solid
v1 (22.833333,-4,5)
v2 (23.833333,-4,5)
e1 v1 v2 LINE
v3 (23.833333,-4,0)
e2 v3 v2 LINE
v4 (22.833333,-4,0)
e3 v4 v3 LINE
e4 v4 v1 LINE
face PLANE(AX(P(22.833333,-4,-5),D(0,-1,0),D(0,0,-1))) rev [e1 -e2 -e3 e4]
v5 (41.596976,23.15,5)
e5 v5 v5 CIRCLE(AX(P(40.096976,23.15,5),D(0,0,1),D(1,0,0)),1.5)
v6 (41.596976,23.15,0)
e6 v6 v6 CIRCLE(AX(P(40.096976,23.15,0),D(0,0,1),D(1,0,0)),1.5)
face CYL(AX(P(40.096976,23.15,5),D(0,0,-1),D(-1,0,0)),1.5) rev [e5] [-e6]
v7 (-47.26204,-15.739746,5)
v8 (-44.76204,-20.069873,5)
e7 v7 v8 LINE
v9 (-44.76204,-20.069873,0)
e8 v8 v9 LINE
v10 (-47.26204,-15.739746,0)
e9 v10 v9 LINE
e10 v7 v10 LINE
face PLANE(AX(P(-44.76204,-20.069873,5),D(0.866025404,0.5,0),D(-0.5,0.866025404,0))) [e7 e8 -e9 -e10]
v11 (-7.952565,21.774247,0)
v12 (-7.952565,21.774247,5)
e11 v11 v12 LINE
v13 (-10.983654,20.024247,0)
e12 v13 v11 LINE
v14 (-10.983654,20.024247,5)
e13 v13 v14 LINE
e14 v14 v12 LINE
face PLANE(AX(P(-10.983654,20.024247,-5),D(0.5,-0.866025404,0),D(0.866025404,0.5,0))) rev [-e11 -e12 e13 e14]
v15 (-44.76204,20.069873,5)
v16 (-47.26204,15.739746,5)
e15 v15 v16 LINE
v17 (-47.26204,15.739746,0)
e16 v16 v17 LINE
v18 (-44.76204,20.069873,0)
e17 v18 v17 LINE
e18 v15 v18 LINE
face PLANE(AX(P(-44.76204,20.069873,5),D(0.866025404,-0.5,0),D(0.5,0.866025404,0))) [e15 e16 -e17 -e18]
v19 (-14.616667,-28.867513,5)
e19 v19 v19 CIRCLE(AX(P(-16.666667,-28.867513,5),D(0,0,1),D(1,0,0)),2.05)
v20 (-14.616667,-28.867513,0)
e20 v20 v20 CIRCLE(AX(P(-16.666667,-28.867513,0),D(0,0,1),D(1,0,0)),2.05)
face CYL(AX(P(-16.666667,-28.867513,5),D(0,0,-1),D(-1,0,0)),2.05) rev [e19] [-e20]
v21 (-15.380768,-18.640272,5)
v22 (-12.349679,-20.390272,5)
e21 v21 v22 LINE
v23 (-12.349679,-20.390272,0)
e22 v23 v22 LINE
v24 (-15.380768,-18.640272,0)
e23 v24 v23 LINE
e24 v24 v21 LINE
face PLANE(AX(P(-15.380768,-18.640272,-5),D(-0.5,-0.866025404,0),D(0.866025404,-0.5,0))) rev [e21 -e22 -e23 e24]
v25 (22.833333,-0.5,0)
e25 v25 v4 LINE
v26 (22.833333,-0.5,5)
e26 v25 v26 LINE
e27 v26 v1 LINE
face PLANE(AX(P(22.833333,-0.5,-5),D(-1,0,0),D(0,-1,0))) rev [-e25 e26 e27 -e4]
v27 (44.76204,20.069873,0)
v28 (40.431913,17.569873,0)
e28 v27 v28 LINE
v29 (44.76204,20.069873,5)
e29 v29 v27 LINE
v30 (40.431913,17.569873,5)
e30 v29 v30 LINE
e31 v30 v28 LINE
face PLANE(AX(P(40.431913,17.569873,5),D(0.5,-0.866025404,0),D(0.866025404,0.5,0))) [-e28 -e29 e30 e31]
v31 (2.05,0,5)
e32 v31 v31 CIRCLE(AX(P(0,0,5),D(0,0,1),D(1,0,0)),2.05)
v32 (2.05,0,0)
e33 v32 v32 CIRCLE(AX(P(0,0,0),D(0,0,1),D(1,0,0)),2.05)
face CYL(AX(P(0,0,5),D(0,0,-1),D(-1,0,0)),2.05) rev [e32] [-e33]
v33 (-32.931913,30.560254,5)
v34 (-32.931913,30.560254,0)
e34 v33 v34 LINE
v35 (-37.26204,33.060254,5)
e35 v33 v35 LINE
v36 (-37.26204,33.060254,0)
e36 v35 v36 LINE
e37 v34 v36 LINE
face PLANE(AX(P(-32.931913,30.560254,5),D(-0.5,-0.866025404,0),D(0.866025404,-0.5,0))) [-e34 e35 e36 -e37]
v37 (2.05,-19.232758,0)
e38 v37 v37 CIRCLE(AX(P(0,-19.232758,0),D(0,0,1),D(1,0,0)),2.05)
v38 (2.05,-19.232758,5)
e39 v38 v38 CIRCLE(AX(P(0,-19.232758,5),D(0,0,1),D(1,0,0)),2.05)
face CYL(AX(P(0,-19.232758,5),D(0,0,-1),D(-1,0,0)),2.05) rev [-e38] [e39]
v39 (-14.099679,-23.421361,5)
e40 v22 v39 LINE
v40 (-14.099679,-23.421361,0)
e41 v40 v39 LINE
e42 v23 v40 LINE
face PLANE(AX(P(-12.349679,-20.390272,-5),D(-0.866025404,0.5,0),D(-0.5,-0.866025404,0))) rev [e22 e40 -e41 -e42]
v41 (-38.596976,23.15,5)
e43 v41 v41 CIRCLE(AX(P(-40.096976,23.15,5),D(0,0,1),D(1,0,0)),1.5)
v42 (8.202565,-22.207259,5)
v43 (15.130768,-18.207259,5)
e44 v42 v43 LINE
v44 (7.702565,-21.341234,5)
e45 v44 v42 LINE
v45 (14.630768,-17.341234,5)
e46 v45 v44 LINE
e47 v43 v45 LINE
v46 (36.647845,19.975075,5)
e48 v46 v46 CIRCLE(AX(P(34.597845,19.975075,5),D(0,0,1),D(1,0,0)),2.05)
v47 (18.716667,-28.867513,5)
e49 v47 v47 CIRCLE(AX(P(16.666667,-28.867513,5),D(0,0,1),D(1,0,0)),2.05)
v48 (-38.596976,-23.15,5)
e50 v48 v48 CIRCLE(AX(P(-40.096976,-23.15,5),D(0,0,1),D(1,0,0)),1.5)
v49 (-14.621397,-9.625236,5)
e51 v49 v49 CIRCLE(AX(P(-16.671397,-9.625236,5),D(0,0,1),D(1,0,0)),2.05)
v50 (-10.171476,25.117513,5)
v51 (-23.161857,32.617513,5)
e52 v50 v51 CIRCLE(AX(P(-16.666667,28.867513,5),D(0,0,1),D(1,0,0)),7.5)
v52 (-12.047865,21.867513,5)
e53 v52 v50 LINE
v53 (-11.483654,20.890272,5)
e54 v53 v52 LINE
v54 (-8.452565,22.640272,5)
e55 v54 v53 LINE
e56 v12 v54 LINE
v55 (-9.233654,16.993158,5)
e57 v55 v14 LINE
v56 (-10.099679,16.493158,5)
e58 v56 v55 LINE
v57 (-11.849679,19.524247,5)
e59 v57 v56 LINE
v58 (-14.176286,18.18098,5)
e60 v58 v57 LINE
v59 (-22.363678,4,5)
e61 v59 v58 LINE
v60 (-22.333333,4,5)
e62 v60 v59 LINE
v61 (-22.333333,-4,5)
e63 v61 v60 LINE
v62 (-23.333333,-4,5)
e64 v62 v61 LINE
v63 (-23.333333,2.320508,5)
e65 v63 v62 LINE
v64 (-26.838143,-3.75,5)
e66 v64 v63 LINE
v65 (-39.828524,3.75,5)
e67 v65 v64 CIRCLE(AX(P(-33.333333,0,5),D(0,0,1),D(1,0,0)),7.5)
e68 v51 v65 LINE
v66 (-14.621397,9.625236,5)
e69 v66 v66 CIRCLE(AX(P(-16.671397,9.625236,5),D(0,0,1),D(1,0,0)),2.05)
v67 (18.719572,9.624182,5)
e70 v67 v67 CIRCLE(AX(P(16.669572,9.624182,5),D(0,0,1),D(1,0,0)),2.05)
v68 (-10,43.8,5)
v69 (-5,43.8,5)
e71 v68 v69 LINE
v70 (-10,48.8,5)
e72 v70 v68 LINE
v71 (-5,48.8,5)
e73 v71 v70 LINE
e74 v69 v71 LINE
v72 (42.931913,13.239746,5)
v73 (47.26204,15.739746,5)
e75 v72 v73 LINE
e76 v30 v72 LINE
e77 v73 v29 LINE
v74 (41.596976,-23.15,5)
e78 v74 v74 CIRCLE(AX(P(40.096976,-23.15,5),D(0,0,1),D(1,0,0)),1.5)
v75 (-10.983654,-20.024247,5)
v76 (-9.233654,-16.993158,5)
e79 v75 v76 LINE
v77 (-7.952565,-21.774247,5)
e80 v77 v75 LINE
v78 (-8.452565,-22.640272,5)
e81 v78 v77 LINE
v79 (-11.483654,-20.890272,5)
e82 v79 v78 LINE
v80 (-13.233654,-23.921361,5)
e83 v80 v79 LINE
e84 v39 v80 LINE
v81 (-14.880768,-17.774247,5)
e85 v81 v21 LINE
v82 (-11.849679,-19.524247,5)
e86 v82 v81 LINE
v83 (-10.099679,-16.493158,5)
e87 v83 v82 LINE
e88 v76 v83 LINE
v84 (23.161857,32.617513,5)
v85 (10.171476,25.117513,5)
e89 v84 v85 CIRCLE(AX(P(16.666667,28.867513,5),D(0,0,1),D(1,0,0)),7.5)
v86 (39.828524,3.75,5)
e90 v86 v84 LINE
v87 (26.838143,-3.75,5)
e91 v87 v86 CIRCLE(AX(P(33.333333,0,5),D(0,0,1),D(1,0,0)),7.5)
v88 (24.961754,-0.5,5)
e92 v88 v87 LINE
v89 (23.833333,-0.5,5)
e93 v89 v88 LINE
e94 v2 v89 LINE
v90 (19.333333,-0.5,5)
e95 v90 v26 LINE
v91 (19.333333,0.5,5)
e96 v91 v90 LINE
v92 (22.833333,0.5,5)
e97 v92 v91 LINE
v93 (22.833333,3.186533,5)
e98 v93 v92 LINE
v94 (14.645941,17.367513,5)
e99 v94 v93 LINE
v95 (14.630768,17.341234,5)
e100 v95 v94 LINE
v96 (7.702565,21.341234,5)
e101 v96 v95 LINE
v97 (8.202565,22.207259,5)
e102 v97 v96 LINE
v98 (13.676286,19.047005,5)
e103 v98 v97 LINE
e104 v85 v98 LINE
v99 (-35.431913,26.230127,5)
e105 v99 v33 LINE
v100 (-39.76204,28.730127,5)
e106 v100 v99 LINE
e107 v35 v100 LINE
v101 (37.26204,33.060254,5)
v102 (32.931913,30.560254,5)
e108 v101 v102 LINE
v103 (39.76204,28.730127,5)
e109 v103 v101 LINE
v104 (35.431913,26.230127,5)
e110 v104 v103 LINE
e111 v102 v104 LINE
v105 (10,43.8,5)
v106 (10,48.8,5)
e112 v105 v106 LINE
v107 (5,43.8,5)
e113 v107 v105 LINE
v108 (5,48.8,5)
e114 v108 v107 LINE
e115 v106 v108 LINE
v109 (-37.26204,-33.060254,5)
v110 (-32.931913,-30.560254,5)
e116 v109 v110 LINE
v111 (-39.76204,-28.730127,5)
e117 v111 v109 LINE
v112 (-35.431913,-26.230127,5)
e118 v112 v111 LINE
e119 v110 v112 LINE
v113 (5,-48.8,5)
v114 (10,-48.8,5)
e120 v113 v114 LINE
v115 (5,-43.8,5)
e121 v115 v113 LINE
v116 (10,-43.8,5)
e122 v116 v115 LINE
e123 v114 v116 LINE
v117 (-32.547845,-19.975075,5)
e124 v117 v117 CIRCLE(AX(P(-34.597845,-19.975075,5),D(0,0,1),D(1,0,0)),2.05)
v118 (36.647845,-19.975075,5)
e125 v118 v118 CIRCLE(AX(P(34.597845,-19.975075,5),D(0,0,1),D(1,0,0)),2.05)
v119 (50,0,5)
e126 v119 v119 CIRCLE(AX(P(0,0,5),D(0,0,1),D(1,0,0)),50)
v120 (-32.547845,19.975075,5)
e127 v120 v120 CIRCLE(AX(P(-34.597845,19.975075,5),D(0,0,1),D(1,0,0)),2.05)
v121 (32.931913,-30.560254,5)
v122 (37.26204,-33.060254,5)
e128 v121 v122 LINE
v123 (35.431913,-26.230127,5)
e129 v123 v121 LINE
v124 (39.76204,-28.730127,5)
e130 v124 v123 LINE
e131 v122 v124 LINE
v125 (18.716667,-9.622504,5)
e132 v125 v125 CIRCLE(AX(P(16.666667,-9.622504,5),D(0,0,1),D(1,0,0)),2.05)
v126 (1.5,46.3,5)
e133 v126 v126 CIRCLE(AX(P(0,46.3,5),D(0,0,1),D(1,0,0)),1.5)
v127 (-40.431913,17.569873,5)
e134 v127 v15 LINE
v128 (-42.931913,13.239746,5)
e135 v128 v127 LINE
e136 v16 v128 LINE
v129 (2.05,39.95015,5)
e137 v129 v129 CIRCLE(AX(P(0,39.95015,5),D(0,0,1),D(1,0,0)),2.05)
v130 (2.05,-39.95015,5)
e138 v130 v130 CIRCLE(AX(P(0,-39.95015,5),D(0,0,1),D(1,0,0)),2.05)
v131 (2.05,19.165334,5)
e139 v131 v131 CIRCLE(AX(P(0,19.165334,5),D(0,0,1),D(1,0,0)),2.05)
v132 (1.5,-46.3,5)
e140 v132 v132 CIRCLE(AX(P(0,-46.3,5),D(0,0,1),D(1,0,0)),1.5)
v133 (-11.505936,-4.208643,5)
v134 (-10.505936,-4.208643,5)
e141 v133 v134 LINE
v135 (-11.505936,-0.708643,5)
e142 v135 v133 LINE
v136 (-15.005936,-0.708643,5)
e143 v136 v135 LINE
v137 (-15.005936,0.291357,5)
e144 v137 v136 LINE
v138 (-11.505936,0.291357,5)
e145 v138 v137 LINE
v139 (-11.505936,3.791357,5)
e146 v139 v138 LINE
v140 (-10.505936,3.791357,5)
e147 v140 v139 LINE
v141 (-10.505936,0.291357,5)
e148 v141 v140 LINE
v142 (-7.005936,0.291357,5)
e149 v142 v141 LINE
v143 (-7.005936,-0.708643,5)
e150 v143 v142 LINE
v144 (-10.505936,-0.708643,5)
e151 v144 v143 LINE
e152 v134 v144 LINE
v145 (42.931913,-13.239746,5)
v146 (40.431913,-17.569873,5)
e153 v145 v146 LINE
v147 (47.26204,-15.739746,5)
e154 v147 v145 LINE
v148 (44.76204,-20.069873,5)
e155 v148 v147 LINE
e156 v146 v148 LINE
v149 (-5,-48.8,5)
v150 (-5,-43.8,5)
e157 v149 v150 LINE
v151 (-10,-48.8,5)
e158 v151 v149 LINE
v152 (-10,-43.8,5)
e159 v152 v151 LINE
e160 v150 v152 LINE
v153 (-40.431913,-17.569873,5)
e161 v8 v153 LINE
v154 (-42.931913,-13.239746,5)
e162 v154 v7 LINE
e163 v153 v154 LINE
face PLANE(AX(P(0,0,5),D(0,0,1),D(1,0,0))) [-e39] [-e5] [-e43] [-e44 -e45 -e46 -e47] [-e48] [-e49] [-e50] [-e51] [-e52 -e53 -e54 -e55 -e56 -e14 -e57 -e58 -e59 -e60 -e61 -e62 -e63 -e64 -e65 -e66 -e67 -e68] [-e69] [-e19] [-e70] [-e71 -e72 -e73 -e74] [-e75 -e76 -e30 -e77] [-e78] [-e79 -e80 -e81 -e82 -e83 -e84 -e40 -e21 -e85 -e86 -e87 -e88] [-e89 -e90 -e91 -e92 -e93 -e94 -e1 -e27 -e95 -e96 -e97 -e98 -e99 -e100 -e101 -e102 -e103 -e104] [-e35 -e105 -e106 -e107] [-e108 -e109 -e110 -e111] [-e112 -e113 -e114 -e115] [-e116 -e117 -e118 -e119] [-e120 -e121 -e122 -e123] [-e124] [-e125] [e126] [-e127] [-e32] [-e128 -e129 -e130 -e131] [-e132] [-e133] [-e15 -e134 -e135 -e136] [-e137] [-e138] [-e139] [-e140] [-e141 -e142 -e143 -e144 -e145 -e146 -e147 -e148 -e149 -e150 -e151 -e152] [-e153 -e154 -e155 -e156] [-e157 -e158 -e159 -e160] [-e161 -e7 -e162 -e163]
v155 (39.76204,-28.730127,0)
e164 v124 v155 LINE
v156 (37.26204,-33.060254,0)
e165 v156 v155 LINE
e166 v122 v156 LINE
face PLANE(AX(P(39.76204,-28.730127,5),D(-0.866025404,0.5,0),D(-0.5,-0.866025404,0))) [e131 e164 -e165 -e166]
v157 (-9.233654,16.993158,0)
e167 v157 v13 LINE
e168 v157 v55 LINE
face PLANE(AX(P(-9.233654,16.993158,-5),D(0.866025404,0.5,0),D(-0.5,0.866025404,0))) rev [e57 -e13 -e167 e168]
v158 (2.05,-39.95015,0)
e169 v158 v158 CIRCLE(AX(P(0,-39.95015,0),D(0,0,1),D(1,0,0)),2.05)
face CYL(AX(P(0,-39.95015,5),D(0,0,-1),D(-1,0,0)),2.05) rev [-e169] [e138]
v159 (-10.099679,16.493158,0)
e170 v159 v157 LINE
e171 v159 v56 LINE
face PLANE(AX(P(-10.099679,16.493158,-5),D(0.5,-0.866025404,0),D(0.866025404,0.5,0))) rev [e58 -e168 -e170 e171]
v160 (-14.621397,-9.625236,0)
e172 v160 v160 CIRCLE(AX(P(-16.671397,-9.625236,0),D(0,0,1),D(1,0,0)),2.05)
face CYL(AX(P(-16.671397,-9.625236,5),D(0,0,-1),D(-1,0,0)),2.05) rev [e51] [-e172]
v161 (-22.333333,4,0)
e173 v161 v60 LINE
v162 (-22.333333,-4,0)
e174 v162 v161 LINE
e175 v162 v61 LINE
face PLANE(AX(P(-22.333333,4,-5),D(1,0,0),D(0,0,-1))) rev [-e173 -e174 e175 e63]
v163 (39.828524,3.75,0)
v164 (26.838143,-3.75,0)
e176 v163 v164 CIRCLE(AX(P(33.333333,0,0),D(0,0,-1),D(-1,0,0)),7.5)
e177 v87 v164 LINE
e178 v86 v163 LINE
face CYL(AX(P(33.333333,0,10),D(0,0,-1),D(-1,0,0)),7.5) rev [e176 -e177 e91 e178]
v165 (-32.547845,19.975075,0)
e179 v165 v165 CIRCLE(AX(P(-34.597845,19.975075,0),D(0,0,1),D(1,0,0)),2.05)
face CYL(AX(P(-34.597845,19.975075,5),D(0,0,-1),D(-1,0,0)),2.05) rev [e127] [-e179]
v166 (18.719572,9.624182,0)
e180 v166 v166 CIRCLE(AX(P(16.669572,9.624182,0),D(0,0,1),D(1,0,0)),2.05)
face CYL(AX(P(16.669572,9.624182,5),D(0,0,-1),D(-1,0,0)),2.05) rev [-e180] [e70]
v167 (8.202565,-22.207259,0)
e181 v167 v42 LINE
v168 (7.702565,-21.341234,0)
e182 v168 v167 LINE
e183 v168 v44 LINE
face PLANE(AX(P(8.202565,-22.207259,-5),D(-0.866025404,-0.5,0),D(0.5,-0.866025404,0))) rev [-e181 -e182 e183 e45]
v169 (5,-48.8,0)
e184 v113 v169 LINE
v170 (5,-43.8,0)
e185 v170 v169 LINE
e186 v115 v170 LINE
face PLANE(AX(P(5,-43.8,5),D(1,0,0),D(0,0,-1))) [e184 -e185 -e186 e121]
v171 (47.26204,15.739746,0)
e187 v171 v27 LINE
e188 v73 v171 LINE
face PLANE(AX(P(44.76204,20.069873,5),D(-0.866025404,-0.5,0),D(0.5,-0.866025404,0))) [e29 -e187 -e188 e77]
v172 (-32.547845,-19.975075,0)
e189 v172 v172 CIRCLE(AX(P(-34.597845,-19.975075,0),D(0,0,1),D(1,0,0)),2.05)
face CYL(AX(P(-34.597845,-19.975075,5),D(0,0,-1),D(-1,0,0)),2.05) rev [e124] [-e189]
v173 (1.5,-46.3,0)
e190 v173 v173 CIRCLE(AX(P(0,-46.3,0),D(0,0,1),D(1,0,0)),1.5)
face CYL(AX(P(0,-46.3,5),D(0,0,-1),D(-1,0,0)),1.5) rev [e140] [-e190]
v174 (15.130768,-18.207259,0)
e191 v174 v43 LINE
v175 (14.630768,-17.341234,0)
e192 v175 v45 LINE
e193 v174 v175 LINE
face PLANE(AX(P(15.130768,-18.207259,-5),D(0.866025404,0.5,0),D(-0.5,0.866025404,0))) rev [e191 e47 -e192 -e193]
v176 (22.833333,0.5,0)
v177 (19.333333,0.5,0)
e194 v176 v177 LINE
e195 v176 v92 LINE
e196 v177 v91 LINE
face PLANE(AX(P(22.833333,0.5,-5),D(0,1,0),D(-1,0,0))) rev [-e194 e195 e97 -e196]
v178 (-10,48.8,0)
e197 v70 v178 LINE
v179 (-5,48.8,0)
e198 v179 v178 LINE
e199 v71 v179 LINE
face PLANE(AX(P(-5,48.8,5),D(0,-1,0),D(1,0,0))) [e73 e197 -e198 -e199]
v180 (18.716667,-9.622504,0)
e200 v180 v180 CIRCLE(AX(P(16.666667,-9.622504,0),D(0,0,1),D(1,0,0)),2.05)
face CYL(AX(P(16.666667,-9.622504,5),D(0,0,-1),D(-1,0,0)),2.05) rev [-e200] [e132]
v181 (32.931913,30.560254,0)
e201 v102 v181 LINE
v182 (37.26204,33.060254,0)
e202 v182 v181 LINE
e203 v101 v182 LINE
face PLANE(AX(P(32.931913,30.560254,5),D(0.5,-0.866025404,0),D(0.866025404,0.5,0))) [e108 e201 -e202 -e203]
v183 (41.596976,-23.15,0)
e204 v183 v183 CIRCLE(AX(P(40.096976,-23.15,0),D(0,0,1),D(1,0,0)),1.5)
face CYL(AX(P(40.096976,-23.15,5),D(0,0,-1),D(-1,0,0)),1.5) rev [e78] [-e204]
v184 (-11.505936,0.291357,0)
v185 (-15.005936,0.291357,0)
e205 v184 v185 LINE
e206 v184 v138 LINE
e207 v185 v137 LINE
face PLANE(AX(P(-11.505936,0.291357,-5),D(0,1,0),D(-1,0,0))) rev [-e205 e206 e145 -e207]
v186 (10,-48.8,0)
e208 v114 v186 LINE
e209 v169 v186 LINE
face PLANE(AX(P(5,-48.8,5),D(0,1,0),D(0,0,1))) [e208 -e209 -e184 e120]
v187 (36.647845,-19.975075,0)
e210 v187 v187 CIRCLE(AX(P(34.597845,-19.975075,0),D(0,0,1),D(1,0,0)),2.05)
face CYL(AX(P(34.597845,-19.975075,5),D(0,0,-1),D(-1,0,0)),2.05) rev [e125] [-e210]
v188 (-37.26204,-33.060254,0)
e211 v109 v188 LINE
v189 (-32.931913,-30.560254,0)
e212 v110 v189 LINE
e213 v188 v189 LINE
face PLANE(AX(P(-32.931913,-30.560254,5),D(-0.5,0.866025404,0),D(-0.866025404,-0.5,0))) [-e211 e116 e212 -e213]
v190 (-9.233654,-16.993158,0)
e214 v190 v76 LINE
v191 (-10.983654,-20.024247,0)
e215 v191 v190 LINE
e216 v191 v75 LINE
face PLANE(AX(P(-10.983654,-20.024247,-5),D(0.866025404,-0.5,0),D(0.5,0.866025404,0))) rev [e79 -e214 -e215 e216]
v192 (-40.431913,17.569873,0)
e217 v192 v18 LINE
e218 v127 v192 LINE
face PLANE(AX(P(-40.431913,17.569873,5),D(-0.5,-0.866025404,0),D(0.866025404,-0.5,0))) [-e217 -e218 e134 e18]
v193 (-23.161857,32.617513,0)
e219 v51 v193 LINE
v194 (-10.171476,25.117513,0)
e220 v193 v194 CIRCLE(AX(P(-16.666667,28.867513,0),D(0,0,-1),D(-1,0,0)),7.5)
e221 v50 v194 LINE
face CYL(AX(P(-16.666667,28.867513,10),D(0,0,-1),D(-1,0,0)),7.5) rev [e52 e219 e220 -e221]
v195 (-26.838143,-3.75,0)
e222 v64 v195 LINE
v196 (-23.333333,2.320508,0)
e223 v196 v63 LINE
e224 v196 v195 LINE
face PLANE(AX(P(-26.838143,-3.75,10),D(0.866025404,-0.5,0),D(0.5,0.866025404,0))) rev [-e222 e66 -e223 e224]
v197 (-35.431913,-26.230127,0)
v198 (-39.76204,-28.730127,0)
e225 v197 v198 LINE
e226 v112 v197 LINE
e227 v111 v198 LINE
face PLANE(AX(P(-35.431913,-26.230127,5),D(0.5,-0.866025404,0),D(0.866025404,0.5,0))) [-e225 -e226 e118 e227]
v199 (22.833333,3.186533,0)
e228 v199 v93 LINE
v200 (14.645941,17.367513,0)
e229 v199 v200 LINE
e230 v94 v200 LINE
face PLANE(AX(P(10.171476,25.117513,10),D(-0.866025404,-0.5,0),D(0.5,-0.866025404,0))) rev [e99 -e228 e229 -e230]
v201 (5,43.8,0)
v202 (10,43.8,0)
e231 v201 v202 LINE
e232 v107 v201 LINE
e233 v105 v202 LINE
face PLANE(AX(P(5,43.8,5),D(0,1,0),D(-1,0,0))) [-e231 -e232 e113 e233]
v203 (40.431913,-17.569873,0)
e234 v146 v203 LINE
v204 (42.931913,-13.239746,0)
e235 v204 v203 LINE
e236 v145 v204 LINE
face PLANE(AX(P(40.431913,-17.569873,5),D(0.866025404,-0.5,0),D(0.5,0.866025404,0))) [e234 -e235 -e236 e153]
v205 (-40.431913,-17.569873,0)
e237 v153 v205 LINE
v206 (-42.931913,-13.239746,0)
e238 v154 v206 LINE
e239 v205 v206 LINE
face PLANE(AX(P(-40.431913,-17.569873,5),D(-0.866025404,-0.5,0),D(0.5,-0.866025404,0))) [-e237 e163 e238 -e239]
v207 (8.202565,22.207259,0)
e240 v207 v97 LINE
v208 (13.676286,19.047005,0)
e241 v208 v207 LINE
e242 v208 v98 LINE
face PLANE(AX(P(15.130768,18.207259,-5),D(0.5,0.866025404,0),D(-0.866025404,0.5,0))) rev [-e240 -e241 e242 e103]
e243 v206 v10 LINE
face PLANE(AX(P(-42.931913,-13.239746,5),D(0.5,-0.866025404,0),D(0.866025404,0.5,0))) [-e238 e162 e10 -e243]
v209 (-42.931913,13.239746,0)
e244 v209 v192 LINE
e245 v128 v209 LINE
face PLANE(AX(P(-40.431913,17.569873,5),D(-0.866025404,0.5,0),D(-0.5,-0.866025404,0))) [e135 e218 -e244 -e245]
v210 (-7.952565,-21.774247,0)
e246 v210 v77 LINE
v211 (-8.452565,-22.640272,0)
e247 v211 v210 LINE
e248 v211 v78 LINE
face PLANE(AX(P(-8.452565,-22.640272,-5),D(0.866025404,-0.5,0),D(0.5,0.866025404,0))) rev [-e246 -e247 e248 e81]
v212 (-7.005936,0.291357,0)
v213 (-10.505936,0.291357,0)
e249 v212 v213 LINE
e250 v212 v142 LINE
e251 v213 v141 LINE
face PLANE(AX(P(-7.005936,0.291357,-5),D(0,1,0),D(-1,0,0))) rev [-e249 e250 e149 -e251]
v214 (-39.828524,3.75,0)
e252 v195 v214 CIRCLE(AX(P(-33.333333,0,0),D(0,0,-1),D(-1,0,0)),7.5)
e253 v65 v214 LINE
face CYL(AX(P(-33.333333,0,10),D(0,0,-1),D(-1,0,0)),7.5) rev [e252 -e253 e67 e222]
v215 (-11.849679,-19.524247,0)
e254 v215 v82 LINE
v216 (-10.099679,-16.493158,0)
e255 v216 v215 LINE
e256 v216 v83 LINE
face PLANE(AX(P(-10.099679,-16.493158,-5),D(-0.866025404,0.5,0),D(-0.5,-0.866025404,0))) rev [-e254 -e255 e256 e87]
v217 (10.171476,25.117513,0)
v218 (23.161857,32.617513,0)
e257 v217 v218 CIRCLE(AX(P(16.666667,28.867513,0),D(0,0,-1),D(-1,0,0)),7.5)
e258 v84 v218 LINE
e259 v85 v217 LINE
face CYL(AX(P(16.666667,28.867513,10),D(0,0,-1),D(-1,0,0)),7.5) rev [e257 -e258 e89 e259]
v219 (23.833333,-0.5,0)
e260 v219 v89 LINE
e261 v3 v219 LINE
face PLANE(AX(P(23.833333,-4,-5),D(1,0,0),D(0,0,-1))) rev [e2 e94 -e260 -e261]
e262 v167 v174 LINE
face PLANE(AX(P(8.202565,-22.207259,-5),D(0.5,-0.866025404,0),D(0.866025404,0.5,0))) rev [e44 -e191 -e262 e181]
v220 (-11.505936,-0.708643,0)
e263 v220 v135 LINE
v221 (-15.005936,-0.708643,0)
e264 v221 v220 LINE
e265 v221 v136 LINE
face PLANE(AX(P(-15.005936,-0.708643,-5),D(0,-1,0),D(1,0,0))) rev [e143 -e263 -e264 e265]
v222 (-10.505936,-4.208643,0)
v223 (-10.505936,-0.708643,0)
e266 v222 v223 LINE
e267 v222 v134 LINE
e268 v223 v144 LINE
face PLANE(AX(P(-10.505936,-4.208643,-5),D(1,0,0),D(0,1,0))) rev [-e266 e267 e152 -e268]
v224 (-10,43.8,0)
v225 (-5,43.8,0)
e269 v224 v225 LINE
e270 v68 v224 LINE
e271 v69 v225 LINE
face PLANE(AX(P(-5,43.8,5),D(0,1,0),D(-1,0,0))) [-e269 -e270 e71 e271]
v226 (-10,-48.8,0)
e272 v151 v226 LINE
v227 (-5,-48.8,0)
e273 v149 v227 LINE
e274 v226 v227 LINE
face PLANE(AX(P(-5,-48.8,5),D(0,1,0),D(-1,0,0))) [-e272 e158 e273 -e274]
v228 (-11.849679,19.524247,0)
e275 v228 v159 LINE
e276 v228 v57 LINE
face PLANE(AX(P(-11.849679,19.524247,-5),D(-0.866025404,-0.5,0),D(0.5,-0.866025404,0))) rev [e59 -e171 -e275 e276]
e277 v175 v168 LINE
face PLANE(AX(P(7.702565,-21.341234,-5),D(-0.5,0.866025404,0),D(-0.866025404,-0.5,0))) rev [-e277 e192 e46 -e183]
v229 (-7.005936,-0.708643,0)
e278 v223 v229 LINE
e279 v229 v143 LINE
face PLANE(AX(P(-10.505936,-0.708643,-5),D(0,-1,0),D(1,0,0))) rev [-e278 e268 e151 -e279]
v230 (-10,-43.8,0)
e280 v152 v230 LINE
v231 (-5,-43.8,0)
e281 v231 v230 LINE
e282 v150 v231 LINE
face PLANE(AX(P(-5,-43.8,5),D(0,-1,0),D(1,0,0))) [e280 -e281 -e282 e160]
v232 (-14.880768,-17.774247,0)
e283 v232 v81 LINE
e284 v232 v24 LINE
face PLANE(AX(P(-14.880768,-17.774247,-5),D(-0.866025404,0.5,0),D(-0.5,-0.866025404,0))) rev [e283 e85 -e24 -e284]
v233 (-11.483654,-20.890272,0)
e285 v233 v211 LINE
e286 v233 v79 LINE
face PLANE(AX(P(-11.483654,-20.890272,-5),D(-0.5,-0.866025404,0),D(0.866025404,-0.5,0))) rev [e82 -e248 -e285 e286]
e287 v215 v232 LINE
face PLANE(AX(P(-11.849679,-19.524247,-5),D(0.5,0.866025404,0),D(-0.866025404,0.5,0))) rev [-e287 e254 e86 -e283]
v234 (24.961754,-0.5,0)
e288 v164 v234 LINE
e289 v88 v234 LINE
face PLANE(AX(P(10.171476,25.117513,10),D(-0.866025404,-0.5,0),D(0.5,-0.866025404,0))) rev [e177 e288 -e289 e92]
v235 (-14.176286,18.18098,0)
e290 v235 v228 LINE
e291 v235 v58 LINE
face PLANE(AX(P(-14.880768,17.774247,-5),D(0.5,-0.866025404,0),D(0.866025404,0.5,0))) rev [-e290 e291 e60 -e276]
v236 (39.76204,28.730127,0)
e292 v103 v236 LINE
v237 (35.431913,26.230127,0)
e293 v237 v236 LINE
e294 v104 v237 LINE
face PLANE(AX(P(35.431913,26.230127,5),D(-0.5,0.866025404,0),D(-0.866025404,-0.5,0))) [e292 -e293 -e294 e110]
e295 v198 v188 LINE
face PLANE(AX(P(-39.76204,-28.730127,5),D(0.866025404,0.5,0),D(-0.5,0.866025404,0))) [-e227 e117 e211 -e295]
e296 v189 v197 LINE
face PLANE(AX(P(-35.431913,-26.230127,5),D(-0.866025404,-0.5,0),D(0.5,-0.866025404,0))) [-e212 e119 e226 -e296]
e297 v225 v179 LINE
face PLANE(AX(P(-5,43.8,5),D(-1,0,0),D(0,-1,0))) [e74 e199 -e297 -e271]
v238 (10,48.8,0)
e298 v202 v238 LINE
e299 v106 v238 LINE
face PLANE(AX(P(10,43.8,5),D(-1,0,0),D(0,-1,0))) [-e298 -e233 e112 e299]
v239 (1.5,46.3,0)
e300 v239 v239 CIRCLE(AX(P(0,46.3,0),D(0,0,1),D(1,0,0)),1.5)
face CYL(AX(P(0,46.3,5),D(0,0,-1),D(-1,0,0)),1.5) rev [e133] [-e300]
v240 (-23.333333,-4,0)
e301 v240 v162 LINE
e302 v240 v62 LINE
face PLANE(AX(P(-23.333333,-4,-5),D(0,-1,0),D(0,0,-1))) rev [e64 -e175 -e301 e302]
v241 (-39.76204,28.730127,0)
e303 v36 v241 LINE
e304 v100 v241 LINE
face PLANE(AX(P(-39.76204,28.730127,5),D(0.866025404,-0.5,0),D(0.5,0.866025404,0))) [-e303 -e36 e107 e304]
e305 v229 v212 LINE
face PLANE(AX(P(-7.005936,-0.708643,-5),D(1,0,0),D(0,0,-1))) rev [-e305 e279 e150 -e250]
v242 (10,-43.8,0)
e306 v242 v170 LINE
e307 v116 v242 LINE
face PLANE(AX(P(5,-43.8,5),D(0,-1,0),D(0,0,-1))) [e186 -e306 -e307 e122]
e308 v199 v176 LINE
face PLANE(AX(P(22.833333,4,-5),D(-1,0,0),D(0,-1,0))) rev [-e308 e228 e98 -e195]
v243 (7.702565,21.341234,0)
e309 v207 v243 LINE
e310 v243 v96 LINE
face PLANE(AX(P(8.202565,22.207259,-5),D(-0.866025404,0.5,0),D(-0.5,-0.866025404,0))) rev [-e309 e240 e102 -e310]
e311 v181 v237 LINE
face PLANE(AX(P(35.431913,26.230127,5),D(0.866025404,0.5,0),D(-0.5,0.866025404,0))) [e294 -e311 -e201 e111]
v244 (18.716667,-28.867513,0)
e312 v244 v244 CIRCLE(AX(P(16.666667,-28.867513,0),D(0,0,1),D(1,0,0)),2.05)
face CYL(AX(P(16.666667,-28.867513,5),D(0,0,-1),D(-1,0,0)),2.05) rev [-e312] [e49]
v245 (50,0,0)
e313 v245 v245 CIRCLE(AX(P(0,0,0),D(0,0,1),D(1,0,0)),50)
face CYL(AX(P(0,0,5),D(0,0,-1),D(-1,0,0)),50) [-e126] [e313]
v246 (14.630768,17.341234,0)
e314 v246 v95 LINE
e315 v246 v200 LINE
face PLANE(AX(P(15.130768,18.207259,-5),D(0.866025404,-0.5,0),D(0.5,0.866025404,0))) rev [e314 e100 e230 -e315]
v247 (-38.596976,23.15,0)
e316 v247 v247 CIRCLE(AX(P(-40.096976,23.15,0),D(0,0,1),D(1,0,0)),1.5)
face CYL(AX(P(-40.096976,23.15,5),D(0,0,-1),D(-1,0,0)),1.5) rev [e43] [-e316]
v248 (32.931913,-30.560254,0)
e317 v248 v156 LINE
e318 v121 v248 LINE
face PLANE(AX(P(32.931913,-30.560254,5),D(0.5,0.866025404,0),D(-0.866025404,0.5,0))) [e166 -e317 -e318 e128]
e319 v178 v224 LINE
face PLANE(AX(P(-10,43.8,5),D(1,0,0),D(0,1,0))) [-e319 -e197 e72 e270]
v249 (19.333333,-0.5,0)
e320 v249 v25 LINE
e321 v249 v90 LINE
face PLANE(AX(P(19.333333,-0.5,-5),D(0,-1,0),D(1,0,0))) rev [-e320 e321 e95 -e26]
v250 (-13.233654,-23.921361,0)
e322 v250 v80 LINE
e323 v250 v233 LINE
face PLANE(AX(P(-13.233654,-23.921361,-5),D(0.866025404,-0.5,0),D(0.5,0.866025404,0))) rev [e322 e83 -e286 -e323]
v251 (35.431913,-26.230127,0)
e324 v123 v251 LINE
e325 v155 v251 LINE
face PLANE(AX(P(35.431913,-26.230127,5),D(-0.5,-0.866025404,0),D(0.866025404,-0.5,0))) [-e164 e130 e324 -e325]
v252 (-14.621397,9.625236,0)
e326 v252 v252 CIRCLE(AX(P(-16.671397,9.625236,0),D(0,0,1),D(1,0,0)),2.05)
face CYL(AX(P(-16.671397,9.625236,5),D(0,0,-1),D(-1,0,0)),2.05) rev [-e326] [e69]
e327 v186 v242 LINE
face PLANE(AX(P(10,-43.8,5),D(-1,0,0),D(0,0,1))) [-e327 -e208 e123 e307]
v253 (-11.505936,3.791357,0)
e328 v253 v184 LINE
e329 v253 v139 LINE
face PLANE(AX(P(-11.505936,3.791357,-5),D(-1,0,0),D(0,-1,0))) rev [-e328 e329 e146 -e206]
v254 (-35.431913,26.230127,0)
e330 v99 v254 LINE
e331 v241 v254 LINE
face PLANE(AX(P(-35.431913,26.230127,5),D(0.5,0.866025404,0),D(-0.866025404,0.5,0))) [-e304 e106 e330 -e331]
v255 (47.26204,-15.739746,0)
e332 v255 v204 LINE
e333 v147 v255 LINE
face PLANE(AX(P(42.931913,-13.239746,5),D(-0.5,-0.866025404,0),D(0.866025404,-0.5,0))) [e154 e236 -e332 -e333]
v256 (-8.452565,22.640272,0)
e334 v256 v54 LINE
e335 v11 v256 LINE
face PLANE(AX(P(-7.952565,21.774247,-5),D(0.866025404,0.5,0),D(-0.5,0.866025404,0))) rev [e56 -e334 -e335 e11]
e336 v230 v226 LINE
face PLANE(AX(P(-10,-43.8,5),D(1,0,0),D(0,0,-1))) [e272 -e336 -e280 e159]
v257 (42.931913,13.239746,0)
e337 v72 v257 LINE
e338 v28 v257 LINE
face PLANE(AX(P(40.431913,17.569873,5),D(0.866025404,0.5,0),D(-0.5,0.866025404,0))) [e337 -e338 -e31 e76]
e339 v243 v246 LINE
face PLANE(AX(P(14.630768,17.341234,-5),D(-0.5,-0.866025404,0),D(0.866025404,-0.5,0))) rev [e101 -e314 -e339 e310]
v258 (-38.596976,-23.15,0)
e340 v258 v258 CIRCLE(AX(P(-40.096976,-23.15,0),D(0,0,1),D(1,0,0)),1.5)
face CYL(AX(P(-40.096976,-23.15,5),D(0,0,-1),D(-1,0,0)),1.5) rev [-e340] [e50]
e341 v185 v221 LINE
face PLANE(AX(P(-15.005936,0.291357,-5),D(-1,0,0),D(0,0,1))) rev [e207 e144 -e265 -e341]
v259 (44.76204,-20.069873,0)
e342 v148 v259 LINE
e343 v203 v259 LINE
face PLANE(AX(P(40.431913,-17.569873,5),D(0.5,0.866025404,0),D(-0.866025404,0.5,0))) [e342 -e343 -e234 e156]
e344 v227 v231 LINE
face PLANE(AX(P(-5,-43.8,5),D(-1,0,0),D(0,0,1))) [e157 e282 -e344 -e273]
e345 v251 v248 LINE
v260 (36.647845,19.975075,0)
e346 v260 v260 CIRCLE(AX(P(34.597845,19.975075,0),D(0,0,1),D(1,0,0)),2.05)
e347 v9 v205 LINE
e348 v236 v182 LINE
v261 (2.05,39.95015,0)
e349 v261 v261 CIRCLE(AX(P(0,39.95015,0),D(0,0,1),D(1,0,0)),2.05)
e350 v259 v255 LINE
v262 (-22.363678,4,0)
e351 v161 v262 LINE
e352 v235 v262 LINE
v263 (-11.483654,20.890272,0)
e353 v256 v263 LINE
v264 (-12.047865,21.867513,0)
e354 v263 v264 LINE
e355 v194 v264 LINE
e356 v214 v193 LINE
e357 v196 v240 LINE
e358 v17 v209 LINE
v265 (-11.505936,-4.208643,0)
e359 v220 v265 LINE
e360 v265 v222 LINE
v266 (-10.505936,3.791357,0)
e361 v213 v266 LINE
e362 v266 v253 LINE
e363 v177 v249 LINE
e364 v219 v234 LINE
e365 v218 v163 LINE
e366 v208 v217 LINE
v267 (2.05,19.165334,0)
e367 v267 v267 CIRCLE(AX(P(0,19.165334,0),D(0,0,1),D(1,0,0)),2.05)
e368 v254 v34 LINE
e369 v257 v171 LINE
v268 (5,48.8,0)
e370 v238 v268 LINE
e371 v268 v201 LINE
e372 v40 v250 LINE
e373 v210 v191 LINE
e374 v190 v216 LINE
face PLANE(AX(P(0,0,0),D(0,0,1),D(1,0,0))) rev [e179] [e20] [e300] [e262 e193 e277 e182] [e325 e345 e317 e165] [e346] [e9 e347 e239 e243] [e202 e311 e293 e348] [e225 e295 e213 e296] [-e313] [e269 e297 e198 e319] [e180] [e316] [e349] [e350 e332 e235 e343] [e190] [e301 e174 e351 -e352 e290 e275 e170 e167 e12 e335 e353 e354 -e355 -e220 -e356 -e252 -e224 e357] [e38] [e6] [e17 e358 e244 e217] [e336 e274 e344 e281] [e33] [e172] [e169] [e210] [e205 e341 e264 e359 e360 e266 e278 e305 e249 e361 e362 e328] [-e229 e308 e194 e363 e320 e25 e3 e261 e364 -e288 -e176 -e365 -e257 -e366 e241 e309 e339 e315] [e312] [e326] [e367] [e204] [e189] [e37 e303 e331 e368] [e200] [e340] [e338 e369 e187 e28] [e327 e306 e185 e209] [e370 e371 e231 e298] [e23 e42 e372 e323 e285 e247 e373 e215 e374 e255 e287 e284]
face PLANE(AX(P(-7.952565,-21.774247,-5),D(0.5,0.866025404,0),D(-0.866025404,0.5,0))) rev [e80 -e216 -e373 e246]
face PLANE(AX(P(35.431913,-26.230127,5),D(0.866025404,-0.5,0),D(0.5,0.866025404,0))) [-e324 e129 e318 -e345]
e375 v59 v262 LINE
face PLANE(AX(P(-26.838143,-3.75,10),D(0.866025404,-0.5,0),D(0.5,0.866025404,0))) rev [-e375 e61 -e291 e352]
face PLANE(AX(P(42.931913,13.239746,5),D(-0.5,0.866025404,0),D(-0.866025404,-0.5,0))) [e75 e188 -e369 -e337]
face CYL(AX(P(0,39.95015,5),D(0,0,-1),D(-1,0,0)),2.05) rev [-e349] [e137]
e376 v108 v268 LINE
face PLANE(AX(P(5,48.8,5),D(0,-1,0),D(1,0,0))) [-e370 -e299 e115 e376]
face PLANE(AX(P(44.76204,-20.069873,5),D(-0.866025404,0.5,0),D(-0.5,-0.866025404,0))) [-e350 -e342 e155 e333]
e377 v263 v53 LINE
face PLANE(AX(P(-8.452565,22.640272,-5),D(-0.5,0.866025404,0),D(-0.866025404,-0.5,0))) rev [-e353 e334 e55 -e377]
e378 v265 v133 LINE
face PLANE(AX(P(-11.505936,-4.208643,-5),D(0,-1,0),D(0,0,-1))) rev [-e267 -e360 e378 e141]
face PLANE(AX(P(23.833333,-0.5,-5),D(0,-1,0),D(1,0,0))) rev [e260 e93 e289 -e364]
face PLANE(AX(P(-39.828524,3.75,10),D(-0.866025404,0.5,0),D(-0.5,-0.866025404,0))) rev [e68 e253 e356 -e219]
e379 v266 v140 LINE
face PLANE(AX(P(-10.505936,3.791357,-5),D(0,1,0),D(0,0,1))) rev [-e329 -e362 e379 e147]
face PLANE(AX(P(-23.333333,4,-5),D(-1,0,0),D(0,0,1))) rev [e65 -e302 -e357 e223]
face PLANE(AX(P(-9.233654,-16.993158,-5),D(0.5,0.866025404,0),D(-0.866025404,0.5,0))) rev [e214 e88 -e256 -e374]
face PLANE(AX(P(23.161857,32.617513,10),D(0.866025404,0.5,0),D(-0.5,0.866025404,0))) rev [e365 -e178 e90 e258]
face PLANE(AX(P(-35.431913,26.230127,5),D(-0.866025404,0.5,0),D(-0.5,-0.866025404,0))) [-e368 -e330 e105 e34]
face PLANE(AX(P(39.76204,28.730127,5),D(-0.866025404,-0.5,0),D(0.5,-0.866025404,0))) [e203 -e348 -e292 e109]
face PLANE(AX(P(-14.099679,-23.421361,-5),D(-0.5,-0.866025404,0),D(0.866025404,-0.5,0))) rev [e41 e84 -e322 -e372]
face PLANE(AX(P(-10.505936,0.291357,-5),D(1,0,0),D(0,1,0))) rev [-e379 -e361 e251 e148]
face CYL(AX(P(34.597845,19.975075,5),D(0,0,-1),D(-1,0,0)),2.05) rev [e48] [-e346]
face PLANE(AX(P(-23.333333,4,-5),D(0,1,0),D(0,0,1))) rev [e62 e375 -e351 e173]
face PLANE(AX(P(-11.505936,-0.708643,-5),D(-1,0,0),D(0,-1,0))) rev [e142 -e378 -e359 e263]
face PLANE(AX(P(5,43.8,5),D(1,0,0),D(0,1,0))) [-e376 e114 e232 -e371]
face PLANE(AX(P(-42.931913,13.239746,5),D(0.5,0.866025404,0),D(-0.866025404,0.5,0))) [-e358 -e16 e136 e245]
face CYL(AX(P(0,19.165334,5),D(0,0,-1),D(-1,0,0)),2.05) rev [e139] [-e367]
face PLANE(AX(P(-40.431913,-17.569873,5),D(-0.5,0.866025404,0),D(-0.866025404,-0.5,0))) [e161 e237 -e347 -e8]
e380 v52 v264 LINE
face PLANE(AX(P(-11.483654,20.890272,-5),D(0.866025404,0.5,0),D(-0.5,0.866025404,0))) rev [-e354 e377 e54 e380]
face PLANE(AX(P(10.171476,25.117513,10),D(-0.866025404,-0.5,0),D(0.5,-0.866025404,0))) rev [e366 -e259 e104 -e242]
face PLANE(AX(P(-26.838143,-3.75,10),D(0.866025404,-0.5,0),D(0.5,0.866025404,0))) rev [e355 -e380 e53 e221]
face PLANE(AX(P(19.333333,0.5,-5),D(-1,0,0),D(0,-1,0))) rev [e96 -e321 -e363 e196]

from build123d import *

# Parameters (mm, degrees)
BOSS_EXTRU_1_OUTLINE_R   = 50
BOSS_EXTRU_1_OUTLINE_W   = 5
BOSS_EXTRU_1_OUTLINE_H   = 5
BOSS_EXTRU_1_OUTLINE_R_2 = 2.05
BOSS_EXTRU_1_OUTLINE_R_3 = 1.5
BOSS_EXTRU_1_DEPTH       = 5
SKETCH3_W                = 1
SKETCH3_H                = 8
CUT_EXTRUDE2_DEPTH       = 10
CUT_EXTRUDE3_DEPTH       = 10


# Read off the part's stored shape, not the designer's step: Boss.-Extru.1
with BuildPart() as part:
    # Boss.-Extru.1 outline → Boss.-Extru.1 (new body)
    with BuildSketch(Plane.XY):
        Circle(BOSS_EXTRU_1_OUTLINE_R)
        Polygon((-37.262039705, -33.060254038), (-39.762039705, -28.730127019), (-35.431912686, -26.230127019), (-32.931912686, -30.560254038), align=None, mode=Mode.SUBTRACT)
        with Locations((-7.5, -46.3)):
            Rectangle(BOSS_EXTRU_1_OUTLINE_W, BOSS_EXTRU_1_OUTLINE_H, mode=Mode.SUBTRACT)
        with Locations((-16.666666667, -28.867513459)):
            Circle(BOSS_EXTRU_1_OUTLINE_R_2, mode=Mode.SUBTRACT)
        with Locations((-40.096976195, -23.15)):
            Circle(BOSS_EXTRU_1_OUTLINE_R_3, mode=Mode.SUBTRACT)
        Polygon((-42.931912686, -13.239745962), (-40.431912686, -17.569872981), (-44.762039705, -20.069872981), (-47.262039705, -15.739745962), align=None, mode=Mode.SUBTRACT)
        with Locations((-34.597845014, -19.975075132)):
            Circle(BOSS_EXTRU_1_OUTLINE_R_2, mode=Mode.SUBTRACT)
        with Locations((-16.671397033, -9.625235564)):
            Circle(BOSS_EXTRU_1_OUTLINE_R_2, mode=Mode.SUBTRACT)
        with Locations((0, -46.3)):
            Circle(BOSS_EXTRU_1_OUTLINE_R_3, mode=Mode.SUBTRACT)
        with Locations((7.5, -46.3)):
            Rectangle(BOSS_EXTRU_1_OUTLINE_W, BOSS_EXTRU_1_OUTLINE_H, mode=Mode.SUBTRACT)
        with Locations((0, -39.950150265)):
            Circle(BOSS_EXTRU_1_OUTLINE_R_2, mode=Mode.SUBTRACT)
        with Locations((16.666666667, -28.867513459)):
            Circle(BOSS_EXTRU_1_OUTLINE_R_2, mode=Mode.SUBTRACT)
        Polygon((32.931912686, -30.560254038), (35.431912686, -26.230127019), (39.762039705, -28.730127019), (37.262039705, -33.060254038), align=None, mode=Mode.SUBTRACT)
        with Locations((0, -19.232757636)):
            Circle(BOSS_EXTRU_1_OUTLINE_R_2, mode=Mode.SUBTRACT)
        with Locations((16.666666667, -9.622504487)):
            Circle(BOSS_EXTRU_1_OUTLINE_R_2, mode=Mode.SUBTRACT)
        with Locations((34.597845014, -19.975075132)):
            Circle(BOSS_EXTRU_1_OUTLINE_R_2, mode=Mode.SUBTRACT)
        with Locations((40.096976195, -23.15)):
            Circle(BOSS_EXTRU_1_OUTLINE_R_3, mode=Mode.SUBTRACT)
        Polygon((47.262039705, -15.739745962), (44.762039705, -20.069872981), (40.431912686, -17.569872981), (42.931912686, -13.239745962), align=None, mode=Mode.SUBTRACT)
        with Locations((-33.333333333, 0)):
            Circle(BOSS_EXTRU_1_OUTLINE_R_2, mode=Mode.SUBTRACT)
        Polygon((-47.262039705, 15.739745962), (-44.762039705, 20.069872981), (-40.431912686, 17.569872981), (-42.931912686, 13.239745962), align=None, mode=Mode.SUBTRACT)
        with Locations((-40.096976195, 23.15)):
            Circle(BOSS_EXTRU_1_OUTLINE_R_3, mode=Mode.SUBTRACT)
        with Locations((-34.597845014, 19.975075132)):
            Circle(BOSS_EXTRU_1_OUTLINE_R_2, mode=Mode.SUBTRACT)
        with Locations((-16.671397032, 9.625235564)):
            Circle(BOSS_EXTRU_1_OUTLINE_R_2, mode=Mode.SUBTRACT)
        Polygon((-32.931912686, 30.560254038), (-35.431912686, 26.230127019), (-39.762039705, 28.730127019), (-37.262039705, 33.060254038), align=None, mode=Mode.SUBTRACT)
        with Locations((-16.666666667, 28.867513459)):
            Circle(BOSS_EXTRU_1_OUTLINE_R_2, mode=Mode.SUBTRACT)
        with Locations((-7.5, 46.3)):
            Rectangle(BOSS_EXTRU_1_OUTLINE_W, BOSS_EXTRU_1_OUTLINE_H, mode=Mode.SUBTRACT)
        Circle(BOSS_EXTRU_1_OUTLINE_R_2, mode=Mode.SUBTRACT)
        with Locations((16.669571796, 9.624181764)):
            Circle(BOSS_EXTRU_1_OUTLINE_R_2, mode=Mode.SUBTRACT)
        with Locations((0, 19.165334425)):
            Circle(BOSS_EXTRU_1_OUTLINE_R_2, mode=Mode.SUBTRACT)
        with Locations((33.333333333, 0)):
            Circle(BOSS_EXTRU_1_OUTLINE_R_2, mode=Mode.SUBTRACT)
        with Locations((34.597845014, 19.975075133)):
            Circle(BOSS_EXTRU_1_OUTLINE_R_2, mode=Mode.SUBTRACT)
        Polygon((42.931912686, 13.239745962), (40.431912686, 17.569872981), (44.762039705, 20.069872981), (47.262039705, 15.739745962), align=None, mode=Mode.SUBTRACT)
        with Locations((40.096976195, 23.15)):
            Circle(BOSS_EXTRU_1_OUTLINE_R_3, mode=Mode.SUBTRACT)
        with Locations((16.666666667, 28.867513459)):
            Circle(BOSS_EXTRU_1_OUTLINE_R_2, mode=Mode.SUBTRACT)
        with Locations((0, 39.950150265)):
            Circle(BOSS_EXTRU_1_OUTLINE_R_2, mode=Mode.SUBTRACT)
        with Locations((0, 46.3)):
            Circle(BOSS_EXTRU_1_OUTLINE_R_3, mode=Mode.SUBTRACT)
        with Locations((7.5, 46.3)):
            Rectangle(BOSS_EXTRU_1_OUTLINE_W, BOSS_EXTRU_1_OUTLINE_H, mode=Mode.SUBTRACT)
        Polygon((37.262039705, 33.060254038), (39.762039705, 28.730127019), (35.431912686, 26.230127019), (32.931912686, 30.560254038), align=None, mode=Mode.SUBTRACT)
    extrude(amount=BOSS_EXTRU_1_DEPTH)

    # Sketch3 → Cut-Extrude2 (cut)
    with BuildSketch(Plane.XY.offset(5)):
        with Locations((-22.833333333, 0)):
            Rectangle(SKETCH3_W, SKETCH3_H)
        Polygon((-13.233653965, 23.921361037), (-14.099679369, 23.421361037), (-12.349679369, 20.390272124), (-15.380768282, 18.640272124), (-14.880768282, 17.77424672), (-11.849679369, 19.52424672), (-10.099679369, 16.493157806), (-9.233653965, 16.993157806), (-10.983653965, 20.02424672), (-7.952565052, 21.77424672), (-8.452565052, 22.640272124), (-11.483653965, 20.890272124), align=None)
        Polygon((15.130768282, 18.207259422), (14.630768282, 17.341234018), (7.702565052, 21.341234018), (8.202565052, 22.207259422), align=None)
        Polygon((8.202565052, -22.207259422), (7.702565052, -21.341234018), (14.630768282, -17.341234018), (15.130768282, -18.207259422), align=None)
        Polygon((27.333333333, -0.5), (27.333333333, 0.5), (23.833333333, 0.5), (23.833333333, 4), (22.833333333, 4), (22.833333333, 0.5), (19.333333333, 0.5), (19.333333333, -0.5), (22.833333333, -0.5), (22.833333333, -4), (23.833333333, -4), (23.833333333, -0.5), align=None)
        Polygon((-14.099679369, -23.421361037), (-13.233653965, -23.921361037), (-11.483653965, -20.890272124), (-8.452565052, -22.640272124), (-7.952565052, -21.77424672), (-10.983653965, -20.02424672), (-9.233653965, -16.993157806), (-10.099679369, -16.493157806), (-11.849679369, -19.52424672), (-14.880768282, -17.77424672), (-15.380768282, -18.640272124), (-12.349679369, -20.390272124), align=None)
        Polygon((-7.005935602, -0.708643072), (-7.005935602, 0.291356928), (-10.505935602, 0.291356928), (-10.505935602, 3.791356928), (-11.505935602, 3.791356928), (-11.505935602, 0.291356928), (-15.005935602, 0.291356928), (-15.005935602, -0.708643072), (-11.505935602, -0.708643072), (-11.505935602, -4.208643072), (-10.505935602, -4.208643072), (-10.505935602, -0.708643072), align=None)
        Polygon((-20.645633013, 13.413868493), (-21.300480769, 12.280855673), (-21.552183494, 12.425987884), (-20.897335737, 13.559000705), align=None)
    extrude(amount=-CUT_EXTRUDE2_DEPTH, mode=Mode.SUBTRACT)

    # Sketch4 → Cut-Extrude3 (cut)
    with BuildSketch(Plane(origin=(0, 0, 0), x_dir=(-1, 0, 0), z_dir=(0, 0, -1))):
        with BuildLine():
            Line((26.838142805, -3.75), (10.171476138, 25.117513459))
            ThreePointArc((10.171476138, 25.117513459), (12.916666667, 35.362703988), (23.161857195, 32.617513459))
            Line((23.161857195, 32.617513459), (39.828523862, 3.75))
            ThreePointArc((39.828523862, 3.75), (37.083333333, -6.495190528), (26.838142805, -3.75))
        make_face()
        with BuildLine():
            Line((-10.171476138, 25.117513459), (-26.838142805, -3.75))
            ThreePointArc((-26.838142805, -3.75), (-37.083333333, -6.495190528), (-39.828523862, 3.75))
            Line((-39.828523862, 3.75), (-23.161857195, 32.617513459))
            ThreePointArc((-23.161857195, 32.617513459), (-12.916666667, 35.362703988), (-10.171476138, 25.117513459))
        make_face()
    extrude(amount=-CUT_EXTRUDE3_DEPTH, mode=Mode.SUBTRACT)


with BuildPart() as body_2:
    # of the pieces the cut leaves, the one that is kept (cut_extrude3_keep)
    add(part.part.solids().sort_by_distance((50, 0, 0))[0])


solid = body_2.part
